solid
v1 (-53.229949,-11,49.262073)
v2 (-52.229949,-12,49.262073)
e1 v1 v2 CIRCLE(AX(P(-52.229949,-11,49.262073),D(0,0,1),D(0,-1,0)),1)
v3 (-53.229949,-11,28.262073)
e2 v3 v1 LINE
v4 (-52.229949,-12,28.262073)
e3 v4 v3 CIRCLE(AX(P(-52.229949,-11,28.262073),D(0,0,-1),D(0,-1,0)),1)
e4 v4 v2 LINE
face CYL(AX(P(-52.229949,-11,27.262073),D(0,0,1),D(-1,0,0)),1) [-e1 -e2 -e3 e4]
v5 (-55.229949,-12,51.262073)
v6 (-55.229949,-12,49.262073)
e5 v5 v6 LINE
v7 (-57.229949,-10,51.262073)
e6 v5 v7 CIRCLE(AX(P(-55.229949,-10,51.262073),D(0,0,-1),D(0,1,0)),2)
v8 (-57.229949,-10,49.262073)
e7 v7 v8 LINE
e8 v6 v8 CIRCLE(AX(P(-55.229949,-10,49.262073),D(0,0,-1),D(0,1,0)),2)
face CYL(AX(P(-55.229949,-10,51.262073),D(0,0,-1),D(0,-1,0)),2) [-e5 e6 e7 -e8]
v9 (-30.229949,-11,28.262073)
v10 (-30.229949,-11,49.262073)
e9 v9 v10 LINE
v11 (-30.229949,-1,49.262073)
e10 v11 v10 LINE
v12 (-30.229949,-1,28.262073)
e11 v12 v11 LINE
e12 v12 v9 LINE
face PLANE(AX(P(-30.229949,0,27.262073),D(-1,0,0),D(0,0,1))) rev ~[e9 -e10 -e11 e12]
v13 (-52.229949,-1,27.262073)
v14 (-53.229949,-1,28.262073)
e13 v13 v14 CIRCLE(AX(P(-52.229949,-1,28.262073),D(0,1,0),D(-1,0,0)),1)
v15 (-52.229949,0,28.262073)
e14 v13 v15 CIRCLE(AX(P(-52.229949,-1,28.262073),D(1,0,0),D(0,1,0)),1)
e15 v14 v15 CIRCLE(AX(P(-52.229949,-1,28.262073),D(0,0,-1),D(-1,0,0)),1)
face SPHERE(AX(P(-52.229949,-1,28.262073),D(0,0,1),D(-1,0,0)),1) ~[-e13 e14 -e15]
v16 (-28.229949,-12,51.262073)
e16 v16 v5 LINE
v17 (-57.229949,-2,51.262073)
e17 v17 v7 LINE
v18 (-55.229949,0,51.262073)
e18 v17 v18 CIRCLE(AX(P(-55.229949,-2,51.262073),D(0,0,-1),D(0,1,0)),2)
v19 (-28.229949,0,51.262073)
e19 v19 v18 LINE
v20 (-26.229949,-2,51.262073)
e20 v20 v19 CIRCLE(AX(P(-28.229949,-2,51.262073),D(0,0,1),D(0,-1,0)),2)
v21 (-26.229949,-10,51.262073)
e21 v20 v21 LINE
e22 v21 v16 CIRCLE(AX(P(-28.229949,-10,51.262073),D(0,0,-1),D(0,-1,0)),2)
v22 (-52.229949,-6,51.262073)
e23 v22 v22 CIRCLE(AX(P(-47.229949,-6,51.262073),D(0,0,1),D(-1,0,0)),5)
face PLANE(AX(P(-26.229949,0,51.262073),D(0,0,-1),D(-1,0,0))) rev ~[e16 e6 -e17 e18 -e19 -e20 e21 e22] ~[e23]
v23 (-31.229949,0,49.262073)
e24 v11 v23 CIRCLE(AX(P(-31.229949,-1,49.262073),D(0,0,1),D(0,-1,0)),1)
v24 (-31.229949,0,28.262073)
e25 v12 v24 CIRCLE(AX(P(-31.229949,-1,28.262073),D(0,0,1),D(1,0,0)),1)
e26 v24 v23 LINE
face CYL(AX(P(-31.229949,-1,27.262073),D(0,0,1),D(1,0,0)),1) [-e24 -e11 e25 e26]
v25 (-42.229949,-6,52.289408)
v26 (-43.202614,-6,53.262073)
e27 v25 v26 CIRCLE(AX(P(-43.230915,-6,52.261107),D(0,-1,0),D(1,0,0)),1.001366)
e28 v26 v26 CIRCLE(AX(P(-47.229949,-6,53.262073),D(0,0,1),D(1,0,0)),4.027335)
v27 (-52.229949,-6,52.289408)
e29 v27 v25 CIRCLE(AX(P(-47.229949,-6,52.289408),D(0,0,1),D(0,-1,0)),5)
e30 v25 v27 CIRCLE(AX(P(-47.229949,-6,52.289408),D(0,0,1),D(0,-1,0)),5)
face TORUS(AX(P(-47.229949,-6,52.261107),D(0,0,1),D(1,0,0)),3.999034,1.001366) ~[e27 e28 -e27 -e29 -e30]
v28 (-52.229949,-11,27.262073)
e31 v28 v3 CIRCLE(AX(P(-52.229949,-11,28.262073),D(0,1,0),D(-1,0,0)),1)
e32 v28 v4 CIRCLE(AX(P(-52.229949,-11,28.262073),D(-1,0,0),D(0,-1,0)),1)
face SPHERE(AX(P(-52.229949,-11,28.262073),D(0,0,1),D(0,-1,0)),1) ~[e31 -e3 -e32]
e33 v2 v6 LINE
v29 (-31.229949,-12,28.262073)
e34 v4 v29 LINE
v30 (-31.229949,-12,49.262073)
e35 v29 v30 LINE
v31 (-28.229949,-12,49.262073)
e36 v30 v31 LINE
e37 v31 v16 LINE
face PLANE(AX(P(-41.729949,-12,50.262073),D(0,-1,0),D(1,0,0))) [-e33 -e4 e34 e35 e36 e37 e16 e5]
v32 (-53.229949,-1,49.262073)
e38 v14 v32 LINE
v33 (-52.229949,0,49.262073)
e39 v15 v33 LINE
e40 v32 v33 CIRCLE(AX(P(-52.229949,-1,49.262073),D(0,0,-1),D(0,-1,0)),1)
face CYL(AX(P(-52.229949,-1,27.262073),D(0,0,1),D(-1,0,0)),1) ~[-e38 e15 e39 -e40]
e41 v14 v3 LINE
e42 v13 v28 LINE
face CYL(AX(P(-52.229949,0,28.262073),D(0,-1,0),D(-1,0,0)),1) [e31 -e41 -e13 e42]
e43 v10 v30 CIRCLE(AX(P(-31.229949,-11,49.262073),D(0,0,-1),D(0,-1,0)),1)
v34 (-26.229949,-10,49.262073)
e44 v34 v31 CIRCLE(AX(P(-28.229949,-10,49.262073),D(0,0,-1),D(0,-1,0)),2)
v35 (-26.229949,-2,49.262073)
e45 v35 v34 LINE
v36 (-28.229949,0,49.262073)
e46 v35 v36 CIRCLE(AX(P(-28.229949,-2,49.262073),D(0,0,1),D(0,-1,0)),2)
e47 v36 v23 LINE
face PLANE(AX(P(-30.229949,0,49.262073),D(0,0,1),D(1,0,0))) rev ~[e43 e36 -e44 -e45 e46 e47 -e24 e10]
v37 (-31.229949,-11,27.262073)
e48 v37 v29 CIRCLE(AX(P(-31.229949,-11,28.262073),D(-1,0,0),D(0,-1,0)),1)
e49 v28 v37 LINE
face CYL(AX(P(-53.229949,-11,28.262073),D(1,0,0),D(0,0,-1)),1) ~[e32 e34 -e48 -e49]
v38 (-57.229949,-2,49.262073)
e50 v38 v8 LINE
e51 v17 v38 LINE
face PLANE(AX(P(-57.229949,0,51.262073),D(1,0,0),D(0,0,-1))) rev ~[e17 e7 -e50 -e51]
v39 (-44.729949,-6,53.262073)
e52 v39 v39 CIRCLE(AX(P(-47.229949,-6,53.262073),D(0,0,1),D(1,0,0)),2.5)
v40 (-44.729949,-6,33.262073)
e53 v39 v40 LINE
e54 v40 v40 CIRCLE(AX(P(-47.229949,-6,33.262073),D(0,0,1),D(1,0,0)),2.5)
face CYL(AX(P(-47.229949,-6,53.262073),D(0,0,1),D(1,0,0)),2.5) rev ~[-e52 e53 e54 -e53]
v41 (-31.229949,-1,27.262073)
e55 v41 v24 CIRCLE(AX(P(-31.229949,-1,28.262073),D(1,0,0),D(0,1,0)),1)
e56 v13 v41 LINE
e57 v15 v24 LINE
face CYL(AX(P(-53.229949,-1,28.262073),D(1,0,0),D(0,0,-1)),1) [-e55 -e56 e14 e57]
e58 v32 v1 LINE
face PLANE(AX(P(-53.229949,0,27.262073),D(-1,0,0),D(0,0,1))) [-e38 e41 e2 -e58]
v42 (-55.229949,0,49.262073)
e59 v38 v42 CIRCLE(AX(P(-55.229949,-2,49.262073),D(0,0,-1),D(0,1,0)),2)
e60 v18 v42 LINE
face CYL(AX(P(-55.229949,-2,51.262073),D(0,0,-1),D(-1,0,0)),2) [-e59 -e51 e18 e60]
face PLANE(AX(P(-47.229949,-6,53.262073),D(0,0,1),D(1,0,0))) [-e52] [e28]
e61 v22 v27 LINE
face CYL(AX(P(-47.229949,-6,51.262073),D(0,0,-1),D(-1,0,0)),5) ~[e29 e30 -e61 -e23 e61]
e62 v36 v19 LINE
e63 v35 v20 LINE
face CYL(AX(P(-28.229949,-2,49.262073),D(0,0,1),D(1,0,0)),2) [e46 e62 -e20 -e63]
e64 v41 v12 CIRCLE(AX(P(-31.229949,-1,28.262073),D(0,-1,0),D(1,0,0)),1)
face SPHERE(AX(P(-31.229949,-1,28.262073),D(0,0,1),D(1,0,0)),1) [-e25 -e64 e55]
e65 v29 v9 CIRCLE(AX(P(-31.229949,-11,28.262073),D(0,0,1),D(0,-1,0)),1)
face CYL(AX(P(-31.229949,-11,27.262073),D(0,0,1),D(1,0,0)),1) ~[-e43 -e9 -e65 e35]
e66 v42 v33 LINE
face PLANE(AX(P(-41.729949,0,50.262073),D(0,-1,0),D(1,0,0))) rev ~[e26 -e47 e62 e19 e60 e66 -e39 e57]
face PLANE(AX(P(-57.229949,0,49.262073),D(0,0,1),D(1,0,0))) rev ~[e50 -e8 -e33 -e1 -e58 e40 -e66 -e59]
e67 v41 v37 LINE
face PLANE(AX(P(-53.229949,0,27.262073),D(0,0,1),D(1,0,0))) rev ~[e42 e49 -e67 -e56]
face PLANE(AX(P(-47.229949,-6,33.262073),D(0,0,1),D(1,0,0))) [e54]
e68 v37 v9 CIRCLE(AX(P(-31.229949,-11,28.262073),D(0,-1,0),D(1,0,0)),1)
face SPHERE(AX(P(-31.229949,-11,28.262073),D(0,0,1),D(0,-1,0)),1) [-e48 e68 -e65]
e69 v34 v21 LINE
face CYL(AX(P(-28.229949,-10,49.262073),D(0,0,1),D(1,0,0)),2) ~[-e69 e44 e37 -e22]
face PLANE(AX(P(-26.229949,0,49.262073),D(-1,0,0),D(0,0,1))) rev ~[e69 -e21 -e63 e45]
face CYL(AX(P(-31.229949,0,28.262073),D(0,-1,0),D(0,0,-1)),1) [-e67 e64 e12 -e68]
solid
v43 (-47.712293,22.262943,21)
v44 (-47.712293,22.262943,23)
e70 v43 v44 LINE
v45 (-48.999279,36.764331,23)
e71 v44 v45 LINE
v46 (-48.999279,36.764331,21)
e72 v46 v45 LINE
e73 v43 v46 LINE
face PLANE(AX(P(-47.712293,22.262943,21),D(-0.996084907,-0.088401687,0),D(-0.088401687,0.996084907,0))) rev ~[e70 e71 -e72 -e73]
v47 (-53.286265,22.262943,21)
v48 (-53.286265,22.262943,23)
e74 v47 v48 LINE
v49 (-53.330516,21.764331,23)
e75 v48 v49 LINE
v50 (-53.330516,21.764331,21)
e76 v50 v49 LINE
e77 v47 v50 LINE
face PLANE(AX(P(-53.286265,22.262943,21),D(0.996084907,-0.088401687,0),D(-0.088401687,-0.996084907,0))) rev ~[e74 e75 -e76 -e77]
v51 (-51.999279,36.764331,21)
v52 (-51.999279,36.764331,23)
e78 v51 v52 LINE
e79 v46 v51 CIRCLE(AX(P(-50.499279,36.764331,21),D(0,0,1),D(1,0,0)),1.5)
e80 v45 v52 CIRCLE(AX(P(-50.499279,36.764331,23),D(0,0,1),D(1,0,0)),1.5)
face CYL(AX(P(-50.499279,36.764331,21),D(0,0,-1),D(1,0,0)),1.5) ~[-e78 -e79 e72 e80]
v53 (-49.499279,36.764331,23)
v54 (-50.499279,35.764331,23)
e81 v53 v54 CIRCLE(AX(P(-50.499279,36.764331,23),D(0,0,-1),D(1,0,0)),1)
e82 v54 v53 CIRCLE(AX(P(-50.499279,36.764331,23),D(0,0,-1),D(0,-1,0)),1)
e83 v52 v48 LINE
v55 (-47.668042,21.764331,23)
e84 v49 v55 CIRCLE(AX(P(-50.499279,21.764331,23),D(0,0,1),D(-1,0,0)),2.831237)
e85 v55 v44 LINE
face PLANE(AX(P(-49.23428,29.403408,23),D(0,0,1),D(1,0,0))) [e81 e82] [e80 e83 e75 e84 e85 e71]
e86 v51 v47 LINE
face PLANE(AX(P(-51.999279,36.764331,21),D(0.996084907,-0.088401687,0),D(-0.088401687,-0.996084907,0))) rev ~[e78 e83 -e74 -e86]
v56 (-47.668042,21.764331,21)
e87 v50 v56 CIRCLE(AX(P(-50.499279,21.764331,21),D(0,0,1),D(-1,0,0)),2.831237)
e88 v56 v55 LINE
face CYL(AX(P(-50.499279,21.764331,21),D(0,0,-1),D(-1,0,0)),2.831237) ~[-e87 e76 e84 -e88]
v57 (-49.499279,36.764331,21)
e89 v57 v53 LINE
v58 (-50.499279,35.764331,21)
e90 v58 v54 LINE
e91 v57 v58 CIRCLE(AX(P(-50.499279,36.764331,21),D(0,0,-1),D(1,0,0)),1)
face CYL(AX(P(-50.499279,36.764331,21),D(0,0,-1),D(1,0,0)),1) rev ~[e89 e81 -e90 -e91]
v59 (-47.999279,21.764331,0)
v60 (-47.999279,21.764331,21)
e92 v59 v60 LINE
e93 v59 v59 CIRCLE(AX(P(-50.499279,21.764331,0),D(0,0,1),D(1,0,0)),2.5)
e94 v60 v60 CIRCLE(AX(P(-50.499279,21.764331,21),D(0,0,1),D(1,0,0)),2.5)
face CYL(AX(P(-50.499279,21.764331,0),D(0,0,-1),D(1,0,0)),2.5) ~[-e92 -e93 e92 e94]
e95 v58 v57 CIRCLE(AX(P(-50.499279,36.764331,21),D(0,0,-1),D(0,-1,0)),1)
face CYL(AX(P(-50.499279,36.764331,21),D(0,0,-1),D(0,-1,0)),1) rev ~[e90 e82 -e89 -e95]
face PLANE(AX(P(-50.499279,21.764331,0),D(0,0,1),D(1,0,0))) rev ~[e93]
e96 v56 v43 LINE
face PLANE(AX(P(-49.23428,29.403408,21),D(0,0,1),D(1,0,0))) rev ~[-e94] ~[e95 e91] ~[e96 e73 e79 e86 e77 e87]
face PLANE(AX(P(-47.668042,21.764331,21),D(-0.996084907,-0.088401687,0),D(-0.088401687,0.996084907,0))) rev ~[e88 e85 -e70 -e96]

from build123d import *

# Parameters (mm, degrees)
F0_W      = 23
F0_H      = 22
F1_DEPTH  = 12
F2_R      = 1
F3_R      = 2
F5_DEPTH  = 2
F7_R      = 2.5
F8_DEPTH  = 20
F9_R      = 2.5
F10_DEPTH = 21
F12_DEPTH = 2


# Not quite as in the source:
# - a fillet or chamfer that OpenCascade refuses, or shapes differently, is made with other operations: its cross-section is extruded or revolved along the edge and cut away or added


with BuildPart() as f1:
    # F0 (on Front) → F1 (new body)
    with BuildSketch(Plane.XZ):
        Polygon((-53.2299494938, 49.2620729506), (-30.2299494938, 49.2620729506), (-26.2299494938, 49.2620729506), (-26.2299494938, 51.2620729506), (-57.2299494938, 51.2620729506), (-57.2299494938, 49.2620729506), align=None)
        with Locations((-41.7299494938, 38.2620729506)):
            Rectangle(F0_W, F0_H)
    extrude(amount=F1_DEPTH)

    # F2
    f2_edges = [f1.edges().sort_by_distance(p)[0] for p in [
        (-53.229949, -12, 38.262073),
        (-30.229949, -12, 38.262073),
        (-53.229949, 0, 38.262073),
        (-30.229949, 0, 38.262073),
        (-41.729949, -12, 27.262073),
        (-53.229949, -6, 27.262073),
        (-30.229949, -6, 27.262073),
        (-41.729949, 0, 27.262073),
    ]]
    fillet(f2_edges, radius=F2_R)

    # F3
    f3_edges = [f1.edges().sort_by_distance(p)[0] for p in [
        (-26.229949, -12, 50.262073),
        (-26.229949, 0, 50.262073),
        (-57.229949, -12, 50.262073),
        (-57.229949, 0, 50.262073),
    ]]
    fillet(f3_edges, radius=F3_R)

    # F4 (on face) → F5 (join)
    with BuildSketch(Plane.XY.offset(51.2620729506)):
        with BuildLine():
            ThreePointArc((-42.2299494938, -6), (-47.2299494938, -1), (-52.2299494938, -6))
            ThreePointArc((-52.2299494938, -6), (-47.2299494938, -11), (-42.2299494938, -6))
        make_face()
    extrude(amount=F5_DEPTH)

    # F6: fillet of radius 1 on 1 edges, made by hand

    # F6_s1 → F6_t2 (revolve, cut)
    with BuildSketch(Plane.XZ.offset(6)):
        with BuildLine():
            ThreePointArc((-42.2295494938, 52.2611072652), (-42.5228427126, 52.9691797318), (-43.2309151792, 53.2624729506))
            Line((-43.2309151792, 53.2624729506), (-43.2309151792, 53.3626095191))
            ThreePointArc((-43.2309151792, 53.3626095191), (-42.7304323365, 53.3622095191), (-42.2299494938, 53.3622095191))
            Line((-42.2299494938, 53.3622095191), (-42.1298129252, 53.2620729506))
            ThreePointArc((-42.1298129252, 53.2620729506), (-42.1298129252, 52.7615901079), (-42.1294129252, 52.2611072652))
            Line((-42.1294129252, 52.2611072652), (-42.2295494938, 52.2611072652))
        make_face()
    revolve(axis=Axis((-47.2299494938, -6, 53.2620729506), (0, 0, -1)), mode=Mode.SUBTRACT)

    # F7 (on face) → F8 (cut)
    with BuildSketch(Plane.XY.offset(53.2620729506)):
        with Locations((-47.2299494938, -6)):
            Circle(F7_R)
    extrude(amount=-F8_DEPTH, mode=Mode.SUBTRACT)


with BuildPart() as f10:
    # F9 (on Top) → F10 (new body)
    with BuildSketch(Plane.XY):
        with Locations((-50.499279052, 21.7643305659)):
            Circle(F9_R)
    extrude(amount=F10_DEPTH)

    # F11 (on face) → F12 (join)
    with BuildSketch(Plane.XY.offset(21)):
        with BuildLine():
            Line((-50.499279052, 35.2643305659), (-50.499279052, 24.5955677889))
            ThreePointArc((-50.499279052, 24.5955677889), (-48.6821090098, 23.9354586715), (-47.7122932643, 22.2629430725))
            Line((-47.7122932643, 22.2629430725), (-48.999279052, 36.7643305659))
            ThreePointArc((-48.999279052, 36.7643305659), (-49.4386188802, 35.7036703941), (-50.499279052, 35.2643305659))
        make_face()
        with BuildLine():
            ThreePointArc((-53.2862648398, 22.2629430725), (-52.3164490942, 23.9354586715), (-50.499279052, 24.5955677889))
            Line((-50.499279052, 24.5955677889), (-50.499279052, 35.2643305659))
            ThreePointArc((-50.499279052, 35.2643305659), (-51.5599392238, 35.7036703941), (-51.999279052, 36.7643305659))
            Line((-51.999279052, 36.7643305659), (-53.2862648398, 22.2629430725))
        make_face()
        with BuildLine():
            ThreePointArc((-47.7122932643, 22.2629430725), (-48.6821090098, 23.9354586715), (-50.499279052, 24.5955677889))
            ThreePointArc((-50.499279052, 24.5955677889), (-52.3164490942, 23.9354586715), (-53.2862648398, 22.2629430725))
            Line((-53.2862648398, 22.2629430725), (-53.330516275, 21.7643305659))
            ThreePointArc((-53.330516275, 21.7643305659), (-50.499279052, 18.9330933429), (-47.668041829, 21.7643305659))
            Line((-47.668041829, 21.7643305659), (-47.7122932643, 22.2629430725))
        make_face()
        with BuildLine():
            ThreePointArc((-47.999279052, 21.7643305659), (-52.267046005, 19.996563613), (-50.499279052, 24.2643305659))
            ThreePointArc((-50.499279052, 24.2643305659), (-48.7315120991, 23.5320975189), (-47.999279052, 21.7643305659))
        make_face(mode=Mode.SUBTRACT)
        with BuildLine():
            ThreePointArc((-47.999279052, 21.7643305659), (-48.7315120991, 23.5320975189), (-50.499279052, 24.2643305659))
            ThreePointArc((-50.499279052, 24.2643305659), (-52.267046005, 19.996563613), (-47.999279052, 21.7643305659))
        make_face()
        with BuildLine():
            ThreePointArc((-51.999279052, 36.7643305659), (-51.5599392238, 35.7036703941), (-50.499279052, 35.2643305659))
            ThreePointArc((-50.499279052, 35.2643305659), (-49.4386188802, 35.7036703941), (-48.999279052, 36.7643305659))
            ThreePointArc((-48.999279052, 36.7643305659), (-50.499279052, 38.2643305659), (-51.999279052, 36.7643305659))
        make_face()
        with BuildLine():
            ThreePointArc((-49.499279052, 36.7643305659), (-49.7921722708, 36.0572237847), (-50.499279052, 35.7643305659))
            ThreePointArc((-50.499279052, 35.7643305659), (-51.2063858332, 37.4714373471), (-49.499279052, 36.7643305659))
        make_face(mode=Mode.SUBTRACT)
    extrude(amount=F12_DEPTH)


solid = Compound([f1.part, f10.part])
